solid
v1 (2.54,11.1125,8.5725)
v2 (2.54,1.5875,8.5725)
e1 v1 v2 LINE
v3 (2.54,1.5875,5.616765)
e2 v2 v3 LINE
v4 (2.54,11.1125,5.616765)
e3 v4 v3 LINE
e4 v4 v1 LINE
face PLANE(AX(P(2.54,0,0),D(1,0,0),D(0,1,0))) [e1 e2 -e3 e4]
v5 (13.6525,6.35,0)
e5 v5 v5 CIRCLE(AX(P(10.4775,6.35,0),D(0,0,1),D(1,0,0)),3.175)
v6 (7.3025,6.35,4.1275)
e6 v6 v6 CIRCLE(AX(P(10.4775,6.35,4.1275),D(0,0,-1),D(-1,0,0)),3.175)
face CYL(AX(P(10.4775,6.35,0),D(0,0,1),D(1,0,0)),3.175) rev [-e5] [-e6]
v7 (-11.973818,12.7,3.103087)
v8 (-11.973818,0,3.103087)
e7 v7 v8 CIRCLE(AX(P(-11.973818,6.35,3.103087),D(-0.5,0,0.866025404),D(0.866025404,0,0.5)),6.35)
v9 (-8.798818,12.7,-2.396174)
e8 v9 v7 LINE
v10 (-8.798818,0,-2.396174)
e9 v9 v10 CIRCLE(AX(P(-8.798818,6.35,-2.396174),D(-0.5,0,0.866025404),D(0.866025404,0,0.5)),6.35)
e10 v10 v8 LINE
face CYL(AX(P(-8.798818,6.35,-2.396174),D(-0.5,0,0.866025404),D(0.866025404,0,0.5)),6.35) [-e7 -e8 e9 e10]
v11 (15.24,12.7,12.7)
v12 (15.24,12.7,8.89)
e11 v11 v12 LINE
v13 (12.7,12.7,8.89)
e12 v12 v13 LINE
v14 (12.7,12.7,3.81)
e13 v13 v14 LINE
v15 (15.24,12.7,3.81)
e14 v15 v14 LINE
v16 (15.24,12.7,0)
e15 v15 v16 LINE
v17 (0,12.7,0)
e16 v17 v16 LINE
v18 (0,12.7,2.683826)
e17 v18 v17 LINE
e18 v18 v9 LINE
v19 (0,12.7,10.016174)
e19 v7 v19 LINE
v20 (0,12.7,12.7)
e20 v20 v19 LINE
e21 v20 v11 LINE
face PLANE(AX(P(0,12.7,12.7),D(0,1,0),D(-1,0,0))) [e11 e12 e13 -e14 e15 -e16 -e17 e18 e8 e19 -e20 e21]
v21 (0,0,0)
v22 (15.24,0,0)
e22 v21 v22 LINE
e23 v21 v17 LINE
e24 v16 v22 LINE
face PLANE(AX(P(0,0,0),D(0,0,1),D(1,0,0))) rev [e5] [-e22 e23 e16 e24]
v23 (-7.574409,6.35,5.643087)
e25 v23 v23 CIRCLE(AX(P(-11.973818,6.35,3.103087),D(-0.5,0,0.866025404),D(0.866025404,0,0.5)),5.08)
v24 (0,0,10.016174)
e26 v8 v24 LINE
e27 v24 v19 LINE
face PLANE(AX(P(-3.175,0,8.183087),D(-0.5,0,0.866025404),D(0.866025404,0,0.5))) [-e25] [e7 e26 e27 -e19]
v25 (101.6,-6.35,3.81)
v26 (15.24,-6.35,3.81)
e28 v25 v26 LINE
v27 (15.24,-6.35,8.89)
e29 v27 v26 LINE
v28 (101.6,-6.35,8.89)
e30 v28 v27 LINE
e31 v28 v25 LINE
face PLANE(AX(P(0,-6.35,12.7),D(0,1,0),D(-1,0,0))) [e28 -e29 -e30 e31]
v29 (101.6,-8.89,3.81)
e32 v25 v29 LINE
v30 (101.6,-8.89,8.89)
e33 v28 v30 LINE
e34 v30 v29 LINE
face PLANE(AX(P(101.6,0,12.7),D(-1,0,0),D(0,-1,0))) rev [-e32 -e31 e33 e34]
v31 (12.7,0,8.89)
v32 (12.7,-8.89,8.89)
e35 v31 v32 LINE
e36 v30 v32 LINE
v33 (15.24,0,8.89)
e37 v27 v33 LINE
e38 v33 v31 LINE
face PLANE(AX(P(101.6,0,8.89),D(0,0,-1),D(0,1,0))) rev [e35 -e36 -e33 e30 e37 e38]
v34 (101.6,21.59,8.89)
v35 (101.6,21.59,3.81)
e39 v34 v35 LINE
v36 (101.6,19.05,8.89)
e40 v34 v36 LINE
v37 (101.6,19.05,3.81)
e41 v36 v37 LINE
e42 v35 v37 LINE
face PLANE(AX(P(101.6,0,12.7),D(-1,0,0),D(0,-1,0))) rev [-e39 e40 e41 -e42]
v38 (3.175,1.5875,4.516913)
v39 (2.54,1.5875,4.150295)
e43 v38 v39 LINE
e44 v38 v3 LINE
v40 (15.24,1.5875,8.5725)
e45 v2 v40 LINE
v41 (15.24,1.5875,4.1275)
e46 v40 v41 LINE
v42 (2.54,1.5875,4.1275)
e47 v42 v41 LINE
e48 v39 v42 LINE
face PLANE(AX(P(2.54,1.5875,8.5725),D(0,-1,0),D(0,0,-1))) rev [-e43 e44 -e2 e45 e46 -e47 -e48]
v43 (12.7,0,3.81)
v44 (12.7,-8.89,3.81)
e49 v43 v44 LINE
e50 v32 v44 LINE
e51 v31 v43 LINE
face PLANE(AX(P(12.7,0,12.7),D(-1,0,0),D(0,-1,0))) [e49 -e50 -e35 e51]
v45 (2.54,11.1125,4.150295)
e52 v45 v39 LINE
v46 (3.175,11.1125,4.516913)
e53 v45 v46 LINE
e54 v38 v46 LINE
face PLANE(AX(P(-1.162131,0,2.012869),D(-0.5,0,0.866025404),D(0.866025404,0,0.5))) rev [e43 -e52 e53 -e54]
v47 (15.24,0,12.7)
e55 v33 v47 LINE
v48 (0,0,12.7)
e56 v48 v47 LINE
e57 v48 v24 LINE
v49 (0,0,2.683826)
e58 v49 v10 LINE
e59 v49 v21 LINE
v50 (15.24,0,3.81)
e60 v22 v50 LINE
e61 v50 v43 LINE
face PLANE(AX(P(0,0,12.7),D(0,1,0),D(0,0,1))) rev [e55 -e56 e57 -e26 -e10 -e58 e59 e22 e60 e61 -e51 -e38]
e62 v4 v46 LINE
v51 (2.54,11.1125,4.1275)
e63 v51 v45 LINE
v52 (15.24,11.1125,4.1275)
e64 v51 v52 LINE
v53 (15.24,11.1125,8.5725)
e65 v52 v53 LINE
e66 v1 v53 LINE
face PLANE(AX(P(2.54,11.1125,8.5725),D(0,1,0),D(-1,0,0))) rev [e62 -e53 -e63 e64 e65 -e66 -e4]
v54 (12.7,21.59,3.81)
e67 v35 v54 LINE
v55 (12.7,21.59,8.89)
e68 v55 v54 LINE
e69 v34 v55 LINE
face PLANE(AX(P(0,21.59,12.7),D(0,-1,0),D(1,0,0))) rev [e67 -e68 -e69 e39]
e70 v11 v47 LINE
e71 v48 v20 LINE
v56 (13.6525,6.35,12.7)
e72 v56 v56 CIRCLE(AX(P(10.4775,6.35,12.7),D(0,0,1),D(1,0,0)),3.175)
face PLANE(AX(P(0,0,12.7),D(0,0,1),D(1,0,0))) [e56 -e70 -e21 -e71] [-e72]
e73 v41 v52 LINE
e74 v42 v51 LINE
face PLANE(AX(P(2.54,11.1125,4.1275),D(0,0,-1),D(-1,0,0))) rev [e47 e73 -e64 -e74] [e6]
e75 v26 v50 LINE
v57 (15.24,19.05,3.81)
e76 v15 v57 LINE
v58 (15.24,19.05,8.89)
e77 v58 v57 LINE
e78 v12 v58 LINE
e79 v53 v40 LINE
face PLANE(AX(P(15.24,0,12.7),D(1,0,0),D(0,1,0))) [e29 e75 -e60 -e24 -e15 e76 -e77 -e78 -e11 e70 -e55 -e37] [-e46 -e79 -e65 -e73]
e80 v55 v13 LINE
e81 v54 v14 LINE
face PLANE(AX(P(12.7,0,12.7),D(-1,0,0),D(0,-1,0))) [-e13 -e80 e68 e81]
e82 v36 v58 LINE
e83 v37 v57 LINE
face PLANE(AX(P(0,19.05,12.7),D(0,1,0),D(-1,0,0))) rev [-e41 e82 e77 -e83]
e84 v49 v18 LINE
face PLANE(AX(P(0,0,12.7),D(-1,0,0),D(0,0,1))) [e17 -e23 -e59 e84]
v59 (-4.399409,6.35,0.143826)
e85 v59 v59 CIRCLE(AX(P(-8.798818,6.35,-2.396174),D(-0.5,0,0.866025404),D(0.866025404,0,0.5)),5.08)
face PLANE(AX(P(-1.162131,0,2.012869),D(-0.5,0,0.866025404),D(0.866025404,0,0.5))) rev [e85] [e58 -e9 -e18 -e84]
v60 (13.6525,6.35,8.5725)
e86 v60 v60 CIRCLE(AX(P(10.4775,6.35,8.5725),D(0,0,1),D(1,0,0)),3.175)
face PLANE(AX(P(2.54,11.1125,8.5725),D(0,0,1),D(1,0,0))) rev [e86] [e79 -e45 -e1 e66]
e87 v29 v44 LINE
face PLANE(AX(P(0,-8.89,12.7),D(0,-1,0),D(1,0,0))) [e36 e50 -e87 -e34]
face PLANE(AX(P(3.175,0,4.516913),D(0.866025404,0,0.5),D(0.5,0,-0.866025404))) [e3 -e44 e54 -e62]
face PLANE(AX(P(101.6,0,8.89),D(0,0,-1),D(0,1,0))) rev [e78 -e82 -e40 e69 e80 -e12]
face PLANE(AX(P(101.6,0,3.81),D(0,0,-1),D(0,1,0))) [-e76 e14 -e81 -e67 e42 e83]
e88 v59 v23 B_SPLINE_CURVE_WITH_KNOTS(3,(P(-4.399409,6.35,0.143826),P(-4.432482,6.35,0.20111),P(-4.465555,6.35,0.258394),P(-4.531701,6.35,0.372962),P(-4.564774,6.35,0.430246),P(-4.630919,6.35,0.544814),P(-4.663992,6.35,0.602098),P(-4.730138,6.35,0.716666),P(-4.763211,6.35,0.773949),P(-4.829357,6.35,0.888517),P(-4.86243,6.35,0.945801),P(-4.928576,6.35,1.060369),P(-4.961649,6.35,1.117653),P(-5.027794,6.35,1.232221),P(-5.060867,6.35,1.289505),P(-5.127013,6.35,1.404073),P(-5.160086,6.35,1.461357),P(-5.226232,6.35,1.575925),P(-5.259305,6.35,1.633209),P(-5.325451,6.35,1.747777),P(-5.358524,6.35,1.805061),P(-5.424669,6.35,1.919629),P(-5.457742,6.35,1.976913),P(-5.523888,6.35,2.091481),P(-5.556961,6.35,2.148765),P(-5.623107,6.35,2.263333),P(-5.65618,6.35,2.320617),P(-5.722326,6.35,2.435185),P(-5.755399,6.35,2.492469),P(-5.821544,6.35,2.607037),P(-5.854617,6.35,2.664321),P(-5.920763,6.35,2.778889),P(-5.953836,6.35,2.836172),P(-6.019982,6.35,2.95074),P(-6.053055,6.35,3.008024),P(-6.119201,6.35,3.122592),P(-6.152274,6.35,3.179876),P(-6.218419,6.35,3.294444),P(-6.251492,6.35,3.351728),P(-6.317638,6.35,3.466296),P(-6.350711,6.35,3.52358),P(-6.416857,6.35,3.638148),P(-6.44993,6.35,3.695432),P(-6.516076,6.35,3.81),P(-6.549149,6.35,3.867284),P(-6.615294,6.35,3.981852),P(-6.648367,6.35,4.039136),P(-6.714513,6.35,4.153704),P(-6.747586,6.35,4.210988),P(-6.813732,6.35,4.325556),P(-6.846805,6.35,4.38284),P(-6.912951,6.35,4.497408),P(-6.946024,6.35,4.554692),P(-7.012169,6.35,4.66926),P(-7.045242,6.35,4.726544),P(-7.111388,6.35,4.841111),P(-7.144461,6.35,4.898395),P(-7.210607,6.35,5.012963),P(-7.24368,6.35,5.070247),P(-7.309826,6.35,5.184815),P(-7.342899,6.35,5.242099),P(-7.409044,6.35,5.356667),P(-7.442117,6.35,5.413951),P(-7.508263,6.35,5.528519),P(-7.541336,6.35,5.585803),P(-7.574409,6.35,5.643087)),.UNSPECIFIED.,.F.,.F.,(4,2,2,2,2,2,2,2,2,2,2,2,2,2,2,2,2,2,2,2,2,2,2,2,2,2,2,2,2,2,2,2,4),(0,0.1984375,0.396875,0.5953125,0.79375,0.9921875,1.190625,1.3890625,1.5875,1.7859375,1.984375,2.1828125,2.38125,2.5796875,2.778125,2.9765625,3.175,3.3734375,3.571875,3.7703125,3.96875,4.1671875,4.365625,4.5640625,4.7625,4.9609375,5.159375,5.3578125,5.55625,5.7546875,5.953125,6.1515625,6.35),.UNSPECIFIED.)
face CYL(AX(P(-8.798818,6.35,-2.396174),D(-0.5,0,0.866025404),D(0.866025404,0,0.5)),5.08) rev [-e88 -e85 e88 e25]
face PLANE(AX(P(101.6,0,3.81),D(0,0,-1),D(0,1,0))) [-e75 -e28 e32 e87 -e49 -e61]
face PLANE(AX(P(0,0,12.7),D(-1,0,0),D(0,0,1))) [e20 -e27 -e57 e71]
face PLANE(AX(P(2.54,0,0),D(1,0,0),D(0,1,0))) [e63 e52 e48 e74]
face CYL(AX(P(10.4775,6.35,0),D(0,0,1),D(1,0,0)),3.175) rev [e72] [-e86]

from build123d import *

# Parameters (mm, degrees)
SKETCH1_W               = 12.7
SKETCH1_H               = 12.7
BOSS_EXTRUDE1_DEPTH     = 12.7
SKETCH3_W               = 3.81
SKETCH3_H               = 8.89
CUT_EXTRUDE1_DEPTH      = 93.361399405
SKETCH4_W               = 4.445
SKETCH4_H               = 9.525
CUT_EXTRUDE2_DEPTH      = 12.7
SKETCH5_R               = 3.175
CUT_EXTRUDE3_DEPTH      = 12.7
BOSS_EXTRUDE3_DEPTH     = 12.7
BOSS_EXTRUDE2_START     = -6.35
BOSS_EXTRUDE2_OUTLINE_R = 5.08
BOSS_EXTRUDE2_DEPTH     = 6.35


# Read off the part's stored shape, not the designer's step: Boss-Extrude2
with BuildPart() as part:
    # Sketch1 → Boss-Extrude1 (new body)
    with BuildSketch(Plane.XY):
        with Locations((6.35, 6.35)):
            Rectangle(SKETCH1_W, SKETCH1_H)
        Polygon((12.7, 12.7), (12.7, 0), (12.7, -8.89), (101.6, -8.89), (101.6, -6.35), (15.24, -6.35), (15.24, 19.05), (101.6, 19.05), (101.6, 21.59), (12.7, 21.59), align=None)
    extrude(amount=BOSS_EXTRUDE1_DEPTH)

    # Sketch3 → Cut-Extrude1 (cut, through all)
    with BuildSketch(Plane.ZY.offset(-12.7)):
        with Locations((1.905, 17.145)):
            Rectangle(SKETCH3_W, SKETCH3_H)
        with Locations((10.795, 17.145)):
            Rectangle(SKETCH3_W, SKETCH3_H)
        with Locations((10.795, -4.445)):
            Rectangle(SKETCH3_W, SKETCH3_H)
        with Locations((1.905, -4.445)):
            Rectangle(SKETCH3_W, SKETCH3_H)
    extrude(amount=-CUT_EXTRUDE1_DEPTH, mode=Mode.SUBTRACT)

    # Sketch4 → Cut-Extrude2 (cut)
    with BuildSketch(Plane(origin=(15.24, 0, 0), x_dir=(0, 0, -1), z_dir=(1, 0, 0))):
        with Locations((-6.35, 6.35)):
            Rectangle(SKETCH4_W, SKETCH4_H)
    extrude(amount=-CUT_EXTRUDE2_DEPTH, mode=Mode.SUBTRACT)

    # Sketch5 → Cut-Extrude3 (cut)
    with BuildSketch(Plane.XY.offset(12.7)):
        with Locations((10.4775, 6.35)):
            Circle(SKETCH5_R)
    extrude(amount=-CUT_EXTRUDE3_DEPTH, mode=Mode.SUBTRACT)

    # Sketch7 → Boss-Extrude3 (add)
    with BuildSketch(Plane(origin=(0, 12.7, 0), x_dir=(1, 0, 0), z_dir=(0, 1, 0))):
        Polygon((0, -2.683825791), (-3.175, -8.183087105), (0, -10.016174209), align=None)
    extrude(amount=-BOSS_EXTRUDE3_DEPTH)

    # Boss-Extrude2 outline → Boss-Extrude2 (add)
    with BuildSketch(Plane(origin=(0.622783942, 0, 10.375738686), x_dir=(0.8660254037844416, 0, 0.499999999999995), z_dir=(-0.49999999999999495, 0, 0.8660254037844415)).offset(BOSS_EXTRUDE2_START)):
        with BuildLine():
            Line((-0.719128953, 12.7), (-14.545303163, 12.7))
            ThreePointArc((-14.545303163, 12.7), (-20.895303163, 6.35), (-14.545303163, 0))
            Line((-14.545303163, 0), (-0.719128953, 0))
            Line((-0.719128953, 0), (-0.719128953, 12.7))
        make_face()
        with Locations((-14.545303163, 6.35)):
            Circle(BOSS_EXTRUDE2_OUTLINE_R, mode=Mode.SUBTRACT)
    extrude(amount=BOSS_EXTRUDE2_DEPTH)


solid = part.part
